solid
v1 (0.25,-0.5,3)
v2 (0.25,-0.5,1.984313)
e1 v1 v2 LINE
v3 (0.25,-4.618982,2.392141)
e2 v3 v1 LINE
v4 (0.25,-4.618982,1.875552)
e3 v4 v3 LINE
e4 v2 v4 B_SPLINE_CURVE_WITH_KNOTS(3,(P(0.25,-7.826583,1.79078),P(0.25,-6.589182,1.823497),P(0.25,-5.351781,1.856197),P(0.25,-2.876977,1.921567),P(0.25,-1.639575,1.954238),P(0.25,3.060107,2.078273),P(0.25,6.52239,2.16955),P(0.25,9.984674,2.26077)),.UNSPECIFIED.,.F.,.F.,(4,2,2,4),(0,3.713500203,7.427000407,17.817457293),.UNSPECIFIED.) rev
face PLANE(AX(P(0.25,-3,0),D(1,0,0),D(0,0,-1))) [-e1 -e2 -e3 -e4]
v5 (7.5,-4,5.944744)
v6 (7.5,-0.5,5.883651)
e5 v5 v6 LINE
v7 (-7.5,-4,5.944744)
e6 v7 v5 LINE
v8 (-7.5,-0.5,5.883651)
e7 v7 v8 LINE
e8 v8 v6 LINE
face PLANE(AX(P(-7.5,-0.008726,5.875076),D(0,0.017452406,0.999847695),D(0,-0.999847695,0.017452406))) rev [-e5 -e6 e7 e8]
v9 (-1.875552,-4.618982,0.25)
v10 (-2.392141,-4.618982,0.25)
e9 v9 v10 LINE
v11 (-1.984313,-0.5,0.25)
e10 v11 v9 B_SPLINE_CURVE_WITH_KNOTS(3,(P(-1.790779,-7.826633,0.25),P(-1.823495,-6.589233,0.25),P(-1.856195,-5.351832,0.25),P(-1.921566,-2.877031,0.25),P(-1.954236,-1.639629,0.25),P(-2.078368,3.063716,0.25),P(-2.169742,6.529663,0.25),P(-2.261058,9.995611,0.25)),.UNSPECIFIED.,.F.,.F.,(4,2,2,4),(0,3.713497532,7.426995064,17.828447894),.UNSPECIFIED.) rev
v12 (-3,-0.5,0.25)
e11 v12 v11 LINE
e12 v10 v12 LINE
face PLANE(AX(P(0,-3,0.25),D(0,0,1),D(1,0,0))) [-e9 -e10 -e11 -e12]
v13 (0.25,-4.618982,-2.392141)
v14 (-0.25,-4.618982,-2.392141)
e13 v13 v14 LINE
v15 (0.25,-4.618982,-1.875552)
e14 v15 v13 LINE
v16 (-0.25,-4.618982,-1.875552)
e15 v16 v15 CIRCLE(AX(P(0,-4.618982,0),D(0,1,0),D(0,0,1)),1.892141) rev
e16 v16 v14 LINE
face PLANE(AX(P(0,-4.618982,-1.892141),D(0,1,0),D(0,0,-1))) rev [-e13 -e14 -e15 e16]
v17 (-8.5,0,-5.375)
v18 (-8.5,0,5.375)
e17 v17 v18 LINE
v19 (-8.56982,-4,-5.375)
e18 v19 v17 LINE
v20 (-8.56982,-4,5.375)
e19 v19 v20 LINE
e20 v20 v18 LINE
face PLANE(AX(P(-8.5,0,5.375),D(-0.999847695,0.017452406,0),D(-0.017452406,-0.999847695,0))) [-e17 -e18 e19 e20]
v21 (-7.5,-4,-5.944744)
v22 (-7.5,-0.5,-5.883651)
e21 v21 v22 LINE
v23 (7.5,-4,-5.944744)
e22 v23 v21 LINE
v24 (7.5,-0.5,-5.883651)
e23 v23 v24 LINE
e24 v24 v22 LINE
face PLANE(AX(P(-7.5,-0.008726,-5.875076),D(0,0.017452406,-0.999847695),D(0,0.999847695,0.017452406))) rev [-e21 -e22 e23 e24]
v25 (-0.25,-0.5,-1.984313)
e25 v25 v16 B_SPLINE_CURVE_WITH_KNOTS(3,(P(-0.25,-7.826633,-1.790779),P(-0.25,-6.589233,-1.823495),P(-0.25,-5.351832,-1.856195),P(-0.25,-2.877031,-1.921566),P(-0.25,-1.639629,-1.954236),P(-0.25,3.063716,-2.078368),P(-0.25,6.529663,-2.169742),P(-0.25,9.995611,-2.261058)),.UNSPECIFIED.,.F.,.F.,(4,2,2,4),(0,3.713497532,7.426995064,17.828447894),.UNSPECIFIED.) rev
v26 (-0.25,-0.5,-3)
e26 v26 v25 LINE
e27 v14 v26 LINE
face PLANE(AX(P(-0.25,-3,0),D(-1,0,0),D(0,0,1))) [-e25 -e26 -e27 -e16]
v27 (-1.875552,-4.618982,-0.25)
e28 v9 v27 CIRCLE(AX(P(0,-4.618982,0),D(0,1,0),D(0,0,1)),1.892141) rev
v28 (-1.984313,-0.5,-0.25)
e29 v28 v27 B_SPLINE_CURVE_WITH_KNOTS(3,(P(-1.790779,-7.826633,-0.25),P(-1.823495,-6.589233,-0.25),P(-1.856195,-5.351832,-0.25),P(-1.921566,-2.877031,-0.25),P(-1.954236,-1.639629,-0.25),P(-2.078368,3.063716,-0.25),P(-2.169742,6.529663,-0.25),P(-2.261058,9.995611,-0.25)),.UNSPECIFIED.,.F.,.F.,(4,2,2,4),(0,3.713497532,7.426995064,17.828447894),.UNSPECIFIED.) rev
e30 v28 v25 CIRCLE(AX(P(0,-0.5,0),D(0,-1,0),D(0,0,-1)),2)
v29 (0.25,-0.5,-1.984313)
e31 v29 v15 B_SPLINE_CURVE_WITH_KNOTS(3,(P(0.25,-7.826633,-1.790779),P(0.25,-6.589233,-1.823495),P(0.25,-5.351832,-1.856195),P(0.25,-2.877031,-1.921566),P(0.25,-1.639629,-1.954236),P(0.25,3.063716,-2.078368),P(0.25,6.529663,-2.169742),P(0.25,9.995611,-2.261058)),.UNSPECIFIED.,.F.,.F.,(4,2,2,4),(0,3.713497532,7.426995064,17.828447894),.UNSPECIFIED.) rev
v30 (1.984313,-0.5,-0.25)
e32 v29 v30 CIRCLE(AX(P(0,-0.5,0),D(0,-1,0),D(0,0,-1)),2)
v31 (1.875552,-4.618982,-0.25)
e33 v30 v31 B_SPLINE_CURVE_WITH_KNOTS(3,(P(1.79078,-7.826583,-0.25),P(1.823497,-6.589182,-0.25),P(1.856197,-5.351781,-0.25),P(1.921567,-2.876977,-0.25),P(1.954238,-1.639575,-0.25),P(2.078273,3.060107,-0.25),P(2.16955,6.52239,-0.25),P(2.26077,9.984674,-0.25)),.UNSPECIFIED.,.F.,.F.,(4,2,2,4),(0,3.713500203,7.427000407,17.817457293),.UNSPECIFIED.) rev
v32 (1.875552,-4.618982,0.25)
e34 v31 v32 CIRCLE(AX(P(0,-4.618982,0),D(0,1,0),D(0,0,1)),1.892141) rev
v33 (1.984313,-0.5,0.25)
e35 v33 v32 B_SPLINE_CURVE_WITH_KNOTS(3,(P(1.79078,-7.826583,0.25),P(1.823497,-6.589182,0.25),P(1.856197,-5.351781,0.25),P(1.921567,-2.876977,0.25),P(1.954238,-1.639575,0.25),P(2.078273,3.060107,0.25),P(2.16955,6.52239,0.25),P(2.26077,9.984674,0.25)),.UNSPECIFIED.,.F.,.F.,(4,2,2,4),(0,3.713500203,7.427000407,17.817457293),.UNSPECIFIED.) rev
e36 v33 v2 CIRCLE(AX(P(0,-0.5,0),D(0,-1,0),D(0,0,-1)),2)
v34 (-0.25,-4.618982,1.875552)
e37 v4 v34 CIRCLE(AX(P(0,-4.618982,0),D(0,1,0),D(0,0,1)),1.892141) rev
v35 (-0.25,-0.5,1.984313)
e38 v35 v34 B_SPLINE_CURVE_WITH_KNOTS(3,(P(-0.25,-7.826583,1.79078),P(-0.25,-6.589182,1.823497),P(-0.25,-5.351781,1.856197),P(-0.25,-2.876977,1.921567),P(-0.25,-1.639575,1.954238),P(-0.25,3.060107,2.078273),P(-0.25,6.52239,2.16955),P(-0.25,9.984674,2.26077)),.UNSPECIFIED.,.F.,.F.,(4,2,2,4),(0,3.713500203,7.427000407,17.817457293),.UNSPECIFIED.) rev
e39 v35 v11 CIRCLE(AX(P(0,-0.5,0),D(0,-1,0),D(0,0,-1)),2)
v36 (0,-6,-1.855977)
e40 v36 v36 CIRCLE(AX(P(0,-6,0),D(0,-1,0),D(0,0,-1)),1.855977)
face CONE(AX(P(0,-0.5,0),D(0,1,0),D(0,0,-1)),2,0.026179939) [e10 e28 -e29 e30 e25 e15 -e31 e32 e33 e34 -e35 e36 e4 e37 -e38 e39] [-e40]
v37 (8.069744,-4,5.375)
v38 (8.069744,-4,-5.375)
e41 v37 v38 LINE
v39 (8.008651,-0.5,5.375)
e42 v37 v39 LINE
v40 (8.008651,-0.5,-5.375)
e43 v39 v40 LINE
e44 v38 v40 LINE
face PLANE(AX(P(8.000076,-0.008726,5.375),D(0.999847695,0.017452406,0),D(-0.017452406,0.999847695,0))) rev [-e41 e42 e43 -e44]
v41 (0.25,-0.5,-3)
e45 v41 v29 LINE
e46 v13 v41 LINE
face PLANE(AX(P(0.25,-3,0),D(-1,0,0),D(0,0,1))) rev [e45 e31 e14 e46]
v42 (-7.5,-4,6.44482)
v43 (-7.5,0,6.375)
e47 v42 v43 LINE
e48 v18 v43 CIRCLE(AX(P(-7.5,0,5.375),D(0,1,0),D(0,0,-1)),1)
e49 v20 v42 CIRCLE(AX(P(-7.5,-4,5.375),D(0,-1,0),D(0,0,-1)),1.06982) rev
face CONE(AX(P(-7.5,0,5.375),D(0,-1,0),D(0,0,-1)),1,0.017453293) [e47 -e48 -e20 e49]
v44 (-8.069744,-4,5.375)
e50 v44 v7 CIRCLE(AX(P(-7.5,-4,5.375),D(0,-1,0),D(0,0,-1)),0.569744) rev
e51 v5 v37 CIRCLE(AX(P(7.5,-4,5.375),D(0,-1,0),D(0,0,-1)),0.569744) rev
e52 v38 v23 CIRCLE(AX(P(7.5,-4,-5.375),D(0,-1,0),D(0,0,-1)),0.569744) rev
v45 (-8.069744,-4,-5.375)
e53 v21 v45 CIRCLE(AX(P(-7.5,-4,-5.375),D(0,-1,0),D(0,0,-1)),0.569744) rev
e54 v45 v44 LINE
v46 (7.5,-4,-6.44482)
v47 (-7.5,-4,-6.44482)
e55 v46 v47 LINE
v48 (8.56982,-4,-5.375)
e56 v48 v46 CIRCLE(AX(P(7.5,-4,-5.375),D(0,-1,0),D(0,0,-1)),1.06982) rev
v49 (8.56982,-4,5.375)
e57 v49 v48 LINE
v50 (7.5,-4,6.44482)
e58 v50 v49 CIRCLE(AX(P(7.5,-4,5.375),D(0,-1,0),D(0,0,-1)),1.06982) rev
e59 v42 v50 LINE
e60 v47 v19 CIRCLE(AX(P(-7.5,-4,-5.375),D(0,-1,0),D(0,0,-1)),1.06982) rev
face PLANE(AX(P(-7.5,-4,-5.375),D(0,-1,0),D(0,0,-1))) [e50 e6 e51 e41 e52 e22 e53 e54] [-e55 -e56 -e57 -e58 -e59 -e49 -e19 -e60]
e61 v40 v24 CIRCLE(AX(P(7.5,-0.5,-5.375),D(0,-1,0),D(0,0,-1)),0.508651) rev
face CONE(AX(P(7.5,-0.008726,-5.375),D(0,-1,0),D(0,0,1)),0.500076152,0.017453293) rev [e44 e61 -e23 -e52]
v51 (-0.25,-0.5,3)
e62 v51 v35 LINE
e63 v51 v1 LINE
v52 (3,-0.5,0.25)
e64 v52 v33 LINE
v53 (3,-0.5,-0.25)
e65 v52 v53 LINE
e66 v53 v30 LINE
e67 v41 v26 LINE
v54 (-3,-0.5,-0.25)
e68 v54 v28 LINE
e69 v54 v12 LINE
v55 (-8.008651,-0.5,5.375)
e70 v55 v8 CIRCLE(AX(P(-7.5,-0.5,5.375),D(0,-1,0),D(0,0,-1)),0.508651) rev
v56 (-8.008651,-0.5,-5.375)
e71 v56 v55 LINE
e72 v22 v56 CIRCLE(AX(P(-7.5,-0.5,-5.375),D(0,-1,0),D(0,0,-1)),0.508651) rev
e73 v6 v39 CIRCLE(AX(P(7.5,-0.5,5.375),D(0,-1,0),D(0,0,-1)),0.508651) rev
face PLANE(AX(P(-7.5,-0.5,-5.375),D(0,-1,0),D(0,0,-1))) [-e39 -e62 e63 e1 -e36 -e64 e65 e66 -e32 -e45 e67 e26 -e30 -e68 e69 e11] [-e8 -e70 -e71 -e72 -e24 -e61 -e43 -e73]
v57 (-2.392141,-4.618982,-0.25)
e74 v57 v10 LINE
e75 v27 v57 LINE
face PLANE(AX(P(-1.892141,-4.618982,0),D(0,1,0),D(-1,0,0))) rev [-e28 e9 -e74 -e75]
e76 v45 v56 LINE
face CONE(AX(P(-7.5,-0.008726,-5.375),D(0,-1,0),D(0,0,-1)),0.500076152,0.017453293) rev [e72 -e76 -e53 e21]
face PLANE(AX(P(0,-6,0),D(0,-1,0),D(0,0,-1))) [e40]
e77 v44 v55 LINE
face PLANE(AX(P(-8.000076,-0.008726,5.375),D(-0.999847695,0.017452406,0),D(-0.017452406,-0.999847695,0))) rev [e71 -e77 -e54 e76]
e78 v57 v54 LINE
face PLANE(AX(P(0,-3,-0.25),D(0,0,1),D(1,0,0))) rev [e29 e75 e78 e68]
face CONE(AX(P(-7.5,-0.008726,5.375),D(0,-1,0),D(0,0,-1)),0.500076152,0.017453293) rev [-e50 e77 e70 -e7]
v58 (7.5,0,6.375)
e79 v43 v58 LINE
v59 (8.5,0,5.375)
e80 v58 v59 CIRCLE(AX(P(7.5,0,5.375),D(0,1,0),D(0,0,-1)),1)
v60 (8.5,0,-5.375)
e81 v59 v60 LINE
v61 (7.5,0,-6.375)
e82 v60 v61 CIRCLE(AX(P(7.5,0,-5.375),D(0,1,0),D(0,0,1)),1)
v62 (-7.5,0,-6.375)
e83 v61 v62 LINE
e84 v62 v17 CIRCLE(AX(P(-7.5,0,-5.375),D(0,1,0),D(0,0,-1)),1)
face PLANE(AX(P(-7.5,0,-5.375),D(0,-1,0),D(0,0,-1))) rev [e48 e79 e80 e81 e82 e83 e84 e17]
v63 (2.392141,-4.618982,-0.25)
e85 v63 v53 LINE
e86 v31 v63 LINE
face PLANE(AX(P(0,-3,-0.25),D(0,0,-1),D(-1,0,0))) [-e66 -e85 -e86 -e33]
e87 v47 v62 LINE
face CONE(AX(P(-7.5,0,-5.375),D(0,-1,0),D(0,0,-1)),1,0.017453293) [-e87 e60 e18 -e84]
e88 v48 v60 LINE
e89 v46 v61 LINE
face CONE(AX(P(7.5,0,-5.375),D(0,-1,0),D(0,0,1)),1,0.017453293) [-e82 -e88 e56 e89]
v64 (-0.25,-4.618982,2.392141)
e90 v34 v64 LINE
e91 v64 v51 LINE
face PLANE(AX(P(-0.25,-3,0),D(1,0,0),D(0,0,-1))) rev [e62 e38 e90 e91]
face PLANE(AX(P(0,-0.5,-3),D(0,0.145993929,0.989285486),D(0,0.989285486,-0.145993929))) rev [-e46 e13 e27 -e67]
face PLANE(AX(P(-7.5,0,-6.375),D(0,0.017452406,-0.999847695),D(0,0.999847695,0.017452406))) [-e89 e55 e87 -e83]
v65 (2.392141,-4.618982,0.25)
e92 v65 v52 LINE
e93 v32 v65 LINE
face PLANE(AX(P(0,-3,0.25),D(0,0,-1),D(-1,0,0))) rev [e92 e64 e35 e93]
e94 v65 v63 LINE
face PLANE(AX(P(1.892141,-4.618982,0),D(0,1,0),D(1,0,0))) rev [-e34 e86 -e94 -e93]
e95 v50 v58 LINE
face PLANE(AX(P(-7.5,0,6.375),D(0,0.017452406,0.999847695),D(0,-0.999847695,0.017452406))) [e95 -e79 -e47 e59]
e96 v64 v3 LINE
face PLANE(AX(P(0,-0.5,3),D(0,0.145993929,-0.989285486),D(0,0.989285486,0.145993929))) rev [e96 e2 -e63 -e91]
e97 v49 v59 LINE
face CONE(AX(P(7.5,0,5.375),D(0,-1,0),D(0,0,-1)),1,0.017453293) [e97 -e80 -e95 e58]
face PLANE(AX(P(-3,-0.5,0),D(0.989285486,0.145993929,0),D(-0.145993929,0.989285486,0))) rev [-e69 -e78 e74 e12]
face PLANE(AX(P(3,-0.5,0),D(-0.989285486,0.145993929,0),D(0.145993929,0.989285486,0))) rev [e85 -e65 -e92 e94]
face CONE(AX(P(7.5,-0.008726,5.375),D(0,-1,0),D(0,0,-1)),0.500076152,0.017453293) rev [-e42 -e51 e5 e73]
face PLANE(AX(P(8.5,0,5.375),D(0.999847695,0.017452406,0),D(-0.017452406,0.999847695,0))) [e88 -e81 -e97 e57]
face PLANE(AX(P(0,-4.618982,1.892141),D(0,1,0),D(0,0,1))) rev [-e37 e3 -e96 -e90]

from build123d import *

# Parameters (mm, degrees)
BOSS_EXTRUDE1_DEPTH = 4
BOSS_EXTRUDE1_DRAFT = 1
SHELL1_T            = -0.5
SKETCH2_R           = 2
BOSS_EXTRUDE2_DEPTH = 5.5
BOSS_EXTRUDE2_TAPER = 1.5
RIB1_START          = -0.25
RIB1_DEPTH          = 0.5
CIRPATTERN1_COUNT   = 4


# Read off the part's stored shape, not the designer's step: Rib1
with BuildPart() as part:
    # Sketch1 → Boss-Extrude1 (with draft: the straight prism first)
    with BuildSketch(Plane(origin=(0, 0, 0), x_dir=(1, 0, 0), z_dir=(0, 1, 0))):
        with BuildLine():
            Line((-7.5, -6.375), (7.5, -6.375))
            ThreePointArc((7.5, -6.375), (8.207106781, -6.082106781), (8.5, -5.375))
            Line((8.5, -5.375), (8.5, 5.375))
            ThreePointArc((8.5, 5.375), (8.207106781, 6.082106781), (7.5, 6.375))
            Line((7.5, 6.375), (-7.5, 6.375))
            ThreePointArc((-7.5, 6.375), (-8.207106781, 6.082106781), (-8.5, 5.375))
            Line((-8.5, 5.375), (-8.5, -5.375))
            ThreePointArc((-8.5, -5.375), (-8.207106781, -6.082106781), (-7.5, -6.375))
        make_face()
    extrude(amount=-BOSS_EXTRUDE1_DEPTH)
    # Boss-Extrude1: the draft: its side faces are tilted about the plane it starts from
    boss_extrude1_sides = [part.faces().sort_by_distance(p)[0] for p in [
        (0, -2, 6.375),
        (8.207106781, -2, 6.082106781),
        (8.5, -2, 0),
        (8.207106781, -2, -6.082106781),
        (0, -2, -6.375),
        (-8.207106781, -2, -6.082106781),
        (-8.5, -2, 0),
        (-8.207106781, -2, 6.082106781),
    ]]
    draft(boss_extrude1_sides, Plane(origin=(0, 0, 0), x_dir=(1, 0, 0), z_dir=(0, 1, 0)), BOSS_EXTRUDE1_DRAFT)

    # Shell1
    shell1_openings = [part.faces().sort_by_distance(p)[0] for p in [
        (0, -4, 0),
    ]]
    offset(amount=SHELL1_T, openings=shell1_openings, kind=Kind.INTERSECTION)

    # Sketch2 → Boss-Extrude2 (add)
    with BuildSketch(Plane.XZ.offset(0.5)):
        Circle(SKETCH2_R)
    extrude(amount=BOSS_EXTRUDE2_DEPTH, taper=BOSS_EXTRUDE2_TAPER)

    # Rib1 outline → Rib1 (add)
    with BuildSketch(Plane.XY.offset(RIB1_START)):
        Polygon((-2.392140648, -4.618982479), (-1, -4.618982479), (-1, 0), (-3.073787562, 0), (-3, -0.5), align=None)
    rib1 = extrude(amount=RIB1_DEPTH)

    # CirPattern1: Rib1 ×4 about axis
    cirpattern1_axis = Axis((0, 0, 0), (0, 1, 0))
    for i in range(1, CIRPATTERN1_COUNT):
        add(rib1.rotate(cirpattern1_axis, i * 360 / CIRPATTERN1_COUNT))


solid = part.part
